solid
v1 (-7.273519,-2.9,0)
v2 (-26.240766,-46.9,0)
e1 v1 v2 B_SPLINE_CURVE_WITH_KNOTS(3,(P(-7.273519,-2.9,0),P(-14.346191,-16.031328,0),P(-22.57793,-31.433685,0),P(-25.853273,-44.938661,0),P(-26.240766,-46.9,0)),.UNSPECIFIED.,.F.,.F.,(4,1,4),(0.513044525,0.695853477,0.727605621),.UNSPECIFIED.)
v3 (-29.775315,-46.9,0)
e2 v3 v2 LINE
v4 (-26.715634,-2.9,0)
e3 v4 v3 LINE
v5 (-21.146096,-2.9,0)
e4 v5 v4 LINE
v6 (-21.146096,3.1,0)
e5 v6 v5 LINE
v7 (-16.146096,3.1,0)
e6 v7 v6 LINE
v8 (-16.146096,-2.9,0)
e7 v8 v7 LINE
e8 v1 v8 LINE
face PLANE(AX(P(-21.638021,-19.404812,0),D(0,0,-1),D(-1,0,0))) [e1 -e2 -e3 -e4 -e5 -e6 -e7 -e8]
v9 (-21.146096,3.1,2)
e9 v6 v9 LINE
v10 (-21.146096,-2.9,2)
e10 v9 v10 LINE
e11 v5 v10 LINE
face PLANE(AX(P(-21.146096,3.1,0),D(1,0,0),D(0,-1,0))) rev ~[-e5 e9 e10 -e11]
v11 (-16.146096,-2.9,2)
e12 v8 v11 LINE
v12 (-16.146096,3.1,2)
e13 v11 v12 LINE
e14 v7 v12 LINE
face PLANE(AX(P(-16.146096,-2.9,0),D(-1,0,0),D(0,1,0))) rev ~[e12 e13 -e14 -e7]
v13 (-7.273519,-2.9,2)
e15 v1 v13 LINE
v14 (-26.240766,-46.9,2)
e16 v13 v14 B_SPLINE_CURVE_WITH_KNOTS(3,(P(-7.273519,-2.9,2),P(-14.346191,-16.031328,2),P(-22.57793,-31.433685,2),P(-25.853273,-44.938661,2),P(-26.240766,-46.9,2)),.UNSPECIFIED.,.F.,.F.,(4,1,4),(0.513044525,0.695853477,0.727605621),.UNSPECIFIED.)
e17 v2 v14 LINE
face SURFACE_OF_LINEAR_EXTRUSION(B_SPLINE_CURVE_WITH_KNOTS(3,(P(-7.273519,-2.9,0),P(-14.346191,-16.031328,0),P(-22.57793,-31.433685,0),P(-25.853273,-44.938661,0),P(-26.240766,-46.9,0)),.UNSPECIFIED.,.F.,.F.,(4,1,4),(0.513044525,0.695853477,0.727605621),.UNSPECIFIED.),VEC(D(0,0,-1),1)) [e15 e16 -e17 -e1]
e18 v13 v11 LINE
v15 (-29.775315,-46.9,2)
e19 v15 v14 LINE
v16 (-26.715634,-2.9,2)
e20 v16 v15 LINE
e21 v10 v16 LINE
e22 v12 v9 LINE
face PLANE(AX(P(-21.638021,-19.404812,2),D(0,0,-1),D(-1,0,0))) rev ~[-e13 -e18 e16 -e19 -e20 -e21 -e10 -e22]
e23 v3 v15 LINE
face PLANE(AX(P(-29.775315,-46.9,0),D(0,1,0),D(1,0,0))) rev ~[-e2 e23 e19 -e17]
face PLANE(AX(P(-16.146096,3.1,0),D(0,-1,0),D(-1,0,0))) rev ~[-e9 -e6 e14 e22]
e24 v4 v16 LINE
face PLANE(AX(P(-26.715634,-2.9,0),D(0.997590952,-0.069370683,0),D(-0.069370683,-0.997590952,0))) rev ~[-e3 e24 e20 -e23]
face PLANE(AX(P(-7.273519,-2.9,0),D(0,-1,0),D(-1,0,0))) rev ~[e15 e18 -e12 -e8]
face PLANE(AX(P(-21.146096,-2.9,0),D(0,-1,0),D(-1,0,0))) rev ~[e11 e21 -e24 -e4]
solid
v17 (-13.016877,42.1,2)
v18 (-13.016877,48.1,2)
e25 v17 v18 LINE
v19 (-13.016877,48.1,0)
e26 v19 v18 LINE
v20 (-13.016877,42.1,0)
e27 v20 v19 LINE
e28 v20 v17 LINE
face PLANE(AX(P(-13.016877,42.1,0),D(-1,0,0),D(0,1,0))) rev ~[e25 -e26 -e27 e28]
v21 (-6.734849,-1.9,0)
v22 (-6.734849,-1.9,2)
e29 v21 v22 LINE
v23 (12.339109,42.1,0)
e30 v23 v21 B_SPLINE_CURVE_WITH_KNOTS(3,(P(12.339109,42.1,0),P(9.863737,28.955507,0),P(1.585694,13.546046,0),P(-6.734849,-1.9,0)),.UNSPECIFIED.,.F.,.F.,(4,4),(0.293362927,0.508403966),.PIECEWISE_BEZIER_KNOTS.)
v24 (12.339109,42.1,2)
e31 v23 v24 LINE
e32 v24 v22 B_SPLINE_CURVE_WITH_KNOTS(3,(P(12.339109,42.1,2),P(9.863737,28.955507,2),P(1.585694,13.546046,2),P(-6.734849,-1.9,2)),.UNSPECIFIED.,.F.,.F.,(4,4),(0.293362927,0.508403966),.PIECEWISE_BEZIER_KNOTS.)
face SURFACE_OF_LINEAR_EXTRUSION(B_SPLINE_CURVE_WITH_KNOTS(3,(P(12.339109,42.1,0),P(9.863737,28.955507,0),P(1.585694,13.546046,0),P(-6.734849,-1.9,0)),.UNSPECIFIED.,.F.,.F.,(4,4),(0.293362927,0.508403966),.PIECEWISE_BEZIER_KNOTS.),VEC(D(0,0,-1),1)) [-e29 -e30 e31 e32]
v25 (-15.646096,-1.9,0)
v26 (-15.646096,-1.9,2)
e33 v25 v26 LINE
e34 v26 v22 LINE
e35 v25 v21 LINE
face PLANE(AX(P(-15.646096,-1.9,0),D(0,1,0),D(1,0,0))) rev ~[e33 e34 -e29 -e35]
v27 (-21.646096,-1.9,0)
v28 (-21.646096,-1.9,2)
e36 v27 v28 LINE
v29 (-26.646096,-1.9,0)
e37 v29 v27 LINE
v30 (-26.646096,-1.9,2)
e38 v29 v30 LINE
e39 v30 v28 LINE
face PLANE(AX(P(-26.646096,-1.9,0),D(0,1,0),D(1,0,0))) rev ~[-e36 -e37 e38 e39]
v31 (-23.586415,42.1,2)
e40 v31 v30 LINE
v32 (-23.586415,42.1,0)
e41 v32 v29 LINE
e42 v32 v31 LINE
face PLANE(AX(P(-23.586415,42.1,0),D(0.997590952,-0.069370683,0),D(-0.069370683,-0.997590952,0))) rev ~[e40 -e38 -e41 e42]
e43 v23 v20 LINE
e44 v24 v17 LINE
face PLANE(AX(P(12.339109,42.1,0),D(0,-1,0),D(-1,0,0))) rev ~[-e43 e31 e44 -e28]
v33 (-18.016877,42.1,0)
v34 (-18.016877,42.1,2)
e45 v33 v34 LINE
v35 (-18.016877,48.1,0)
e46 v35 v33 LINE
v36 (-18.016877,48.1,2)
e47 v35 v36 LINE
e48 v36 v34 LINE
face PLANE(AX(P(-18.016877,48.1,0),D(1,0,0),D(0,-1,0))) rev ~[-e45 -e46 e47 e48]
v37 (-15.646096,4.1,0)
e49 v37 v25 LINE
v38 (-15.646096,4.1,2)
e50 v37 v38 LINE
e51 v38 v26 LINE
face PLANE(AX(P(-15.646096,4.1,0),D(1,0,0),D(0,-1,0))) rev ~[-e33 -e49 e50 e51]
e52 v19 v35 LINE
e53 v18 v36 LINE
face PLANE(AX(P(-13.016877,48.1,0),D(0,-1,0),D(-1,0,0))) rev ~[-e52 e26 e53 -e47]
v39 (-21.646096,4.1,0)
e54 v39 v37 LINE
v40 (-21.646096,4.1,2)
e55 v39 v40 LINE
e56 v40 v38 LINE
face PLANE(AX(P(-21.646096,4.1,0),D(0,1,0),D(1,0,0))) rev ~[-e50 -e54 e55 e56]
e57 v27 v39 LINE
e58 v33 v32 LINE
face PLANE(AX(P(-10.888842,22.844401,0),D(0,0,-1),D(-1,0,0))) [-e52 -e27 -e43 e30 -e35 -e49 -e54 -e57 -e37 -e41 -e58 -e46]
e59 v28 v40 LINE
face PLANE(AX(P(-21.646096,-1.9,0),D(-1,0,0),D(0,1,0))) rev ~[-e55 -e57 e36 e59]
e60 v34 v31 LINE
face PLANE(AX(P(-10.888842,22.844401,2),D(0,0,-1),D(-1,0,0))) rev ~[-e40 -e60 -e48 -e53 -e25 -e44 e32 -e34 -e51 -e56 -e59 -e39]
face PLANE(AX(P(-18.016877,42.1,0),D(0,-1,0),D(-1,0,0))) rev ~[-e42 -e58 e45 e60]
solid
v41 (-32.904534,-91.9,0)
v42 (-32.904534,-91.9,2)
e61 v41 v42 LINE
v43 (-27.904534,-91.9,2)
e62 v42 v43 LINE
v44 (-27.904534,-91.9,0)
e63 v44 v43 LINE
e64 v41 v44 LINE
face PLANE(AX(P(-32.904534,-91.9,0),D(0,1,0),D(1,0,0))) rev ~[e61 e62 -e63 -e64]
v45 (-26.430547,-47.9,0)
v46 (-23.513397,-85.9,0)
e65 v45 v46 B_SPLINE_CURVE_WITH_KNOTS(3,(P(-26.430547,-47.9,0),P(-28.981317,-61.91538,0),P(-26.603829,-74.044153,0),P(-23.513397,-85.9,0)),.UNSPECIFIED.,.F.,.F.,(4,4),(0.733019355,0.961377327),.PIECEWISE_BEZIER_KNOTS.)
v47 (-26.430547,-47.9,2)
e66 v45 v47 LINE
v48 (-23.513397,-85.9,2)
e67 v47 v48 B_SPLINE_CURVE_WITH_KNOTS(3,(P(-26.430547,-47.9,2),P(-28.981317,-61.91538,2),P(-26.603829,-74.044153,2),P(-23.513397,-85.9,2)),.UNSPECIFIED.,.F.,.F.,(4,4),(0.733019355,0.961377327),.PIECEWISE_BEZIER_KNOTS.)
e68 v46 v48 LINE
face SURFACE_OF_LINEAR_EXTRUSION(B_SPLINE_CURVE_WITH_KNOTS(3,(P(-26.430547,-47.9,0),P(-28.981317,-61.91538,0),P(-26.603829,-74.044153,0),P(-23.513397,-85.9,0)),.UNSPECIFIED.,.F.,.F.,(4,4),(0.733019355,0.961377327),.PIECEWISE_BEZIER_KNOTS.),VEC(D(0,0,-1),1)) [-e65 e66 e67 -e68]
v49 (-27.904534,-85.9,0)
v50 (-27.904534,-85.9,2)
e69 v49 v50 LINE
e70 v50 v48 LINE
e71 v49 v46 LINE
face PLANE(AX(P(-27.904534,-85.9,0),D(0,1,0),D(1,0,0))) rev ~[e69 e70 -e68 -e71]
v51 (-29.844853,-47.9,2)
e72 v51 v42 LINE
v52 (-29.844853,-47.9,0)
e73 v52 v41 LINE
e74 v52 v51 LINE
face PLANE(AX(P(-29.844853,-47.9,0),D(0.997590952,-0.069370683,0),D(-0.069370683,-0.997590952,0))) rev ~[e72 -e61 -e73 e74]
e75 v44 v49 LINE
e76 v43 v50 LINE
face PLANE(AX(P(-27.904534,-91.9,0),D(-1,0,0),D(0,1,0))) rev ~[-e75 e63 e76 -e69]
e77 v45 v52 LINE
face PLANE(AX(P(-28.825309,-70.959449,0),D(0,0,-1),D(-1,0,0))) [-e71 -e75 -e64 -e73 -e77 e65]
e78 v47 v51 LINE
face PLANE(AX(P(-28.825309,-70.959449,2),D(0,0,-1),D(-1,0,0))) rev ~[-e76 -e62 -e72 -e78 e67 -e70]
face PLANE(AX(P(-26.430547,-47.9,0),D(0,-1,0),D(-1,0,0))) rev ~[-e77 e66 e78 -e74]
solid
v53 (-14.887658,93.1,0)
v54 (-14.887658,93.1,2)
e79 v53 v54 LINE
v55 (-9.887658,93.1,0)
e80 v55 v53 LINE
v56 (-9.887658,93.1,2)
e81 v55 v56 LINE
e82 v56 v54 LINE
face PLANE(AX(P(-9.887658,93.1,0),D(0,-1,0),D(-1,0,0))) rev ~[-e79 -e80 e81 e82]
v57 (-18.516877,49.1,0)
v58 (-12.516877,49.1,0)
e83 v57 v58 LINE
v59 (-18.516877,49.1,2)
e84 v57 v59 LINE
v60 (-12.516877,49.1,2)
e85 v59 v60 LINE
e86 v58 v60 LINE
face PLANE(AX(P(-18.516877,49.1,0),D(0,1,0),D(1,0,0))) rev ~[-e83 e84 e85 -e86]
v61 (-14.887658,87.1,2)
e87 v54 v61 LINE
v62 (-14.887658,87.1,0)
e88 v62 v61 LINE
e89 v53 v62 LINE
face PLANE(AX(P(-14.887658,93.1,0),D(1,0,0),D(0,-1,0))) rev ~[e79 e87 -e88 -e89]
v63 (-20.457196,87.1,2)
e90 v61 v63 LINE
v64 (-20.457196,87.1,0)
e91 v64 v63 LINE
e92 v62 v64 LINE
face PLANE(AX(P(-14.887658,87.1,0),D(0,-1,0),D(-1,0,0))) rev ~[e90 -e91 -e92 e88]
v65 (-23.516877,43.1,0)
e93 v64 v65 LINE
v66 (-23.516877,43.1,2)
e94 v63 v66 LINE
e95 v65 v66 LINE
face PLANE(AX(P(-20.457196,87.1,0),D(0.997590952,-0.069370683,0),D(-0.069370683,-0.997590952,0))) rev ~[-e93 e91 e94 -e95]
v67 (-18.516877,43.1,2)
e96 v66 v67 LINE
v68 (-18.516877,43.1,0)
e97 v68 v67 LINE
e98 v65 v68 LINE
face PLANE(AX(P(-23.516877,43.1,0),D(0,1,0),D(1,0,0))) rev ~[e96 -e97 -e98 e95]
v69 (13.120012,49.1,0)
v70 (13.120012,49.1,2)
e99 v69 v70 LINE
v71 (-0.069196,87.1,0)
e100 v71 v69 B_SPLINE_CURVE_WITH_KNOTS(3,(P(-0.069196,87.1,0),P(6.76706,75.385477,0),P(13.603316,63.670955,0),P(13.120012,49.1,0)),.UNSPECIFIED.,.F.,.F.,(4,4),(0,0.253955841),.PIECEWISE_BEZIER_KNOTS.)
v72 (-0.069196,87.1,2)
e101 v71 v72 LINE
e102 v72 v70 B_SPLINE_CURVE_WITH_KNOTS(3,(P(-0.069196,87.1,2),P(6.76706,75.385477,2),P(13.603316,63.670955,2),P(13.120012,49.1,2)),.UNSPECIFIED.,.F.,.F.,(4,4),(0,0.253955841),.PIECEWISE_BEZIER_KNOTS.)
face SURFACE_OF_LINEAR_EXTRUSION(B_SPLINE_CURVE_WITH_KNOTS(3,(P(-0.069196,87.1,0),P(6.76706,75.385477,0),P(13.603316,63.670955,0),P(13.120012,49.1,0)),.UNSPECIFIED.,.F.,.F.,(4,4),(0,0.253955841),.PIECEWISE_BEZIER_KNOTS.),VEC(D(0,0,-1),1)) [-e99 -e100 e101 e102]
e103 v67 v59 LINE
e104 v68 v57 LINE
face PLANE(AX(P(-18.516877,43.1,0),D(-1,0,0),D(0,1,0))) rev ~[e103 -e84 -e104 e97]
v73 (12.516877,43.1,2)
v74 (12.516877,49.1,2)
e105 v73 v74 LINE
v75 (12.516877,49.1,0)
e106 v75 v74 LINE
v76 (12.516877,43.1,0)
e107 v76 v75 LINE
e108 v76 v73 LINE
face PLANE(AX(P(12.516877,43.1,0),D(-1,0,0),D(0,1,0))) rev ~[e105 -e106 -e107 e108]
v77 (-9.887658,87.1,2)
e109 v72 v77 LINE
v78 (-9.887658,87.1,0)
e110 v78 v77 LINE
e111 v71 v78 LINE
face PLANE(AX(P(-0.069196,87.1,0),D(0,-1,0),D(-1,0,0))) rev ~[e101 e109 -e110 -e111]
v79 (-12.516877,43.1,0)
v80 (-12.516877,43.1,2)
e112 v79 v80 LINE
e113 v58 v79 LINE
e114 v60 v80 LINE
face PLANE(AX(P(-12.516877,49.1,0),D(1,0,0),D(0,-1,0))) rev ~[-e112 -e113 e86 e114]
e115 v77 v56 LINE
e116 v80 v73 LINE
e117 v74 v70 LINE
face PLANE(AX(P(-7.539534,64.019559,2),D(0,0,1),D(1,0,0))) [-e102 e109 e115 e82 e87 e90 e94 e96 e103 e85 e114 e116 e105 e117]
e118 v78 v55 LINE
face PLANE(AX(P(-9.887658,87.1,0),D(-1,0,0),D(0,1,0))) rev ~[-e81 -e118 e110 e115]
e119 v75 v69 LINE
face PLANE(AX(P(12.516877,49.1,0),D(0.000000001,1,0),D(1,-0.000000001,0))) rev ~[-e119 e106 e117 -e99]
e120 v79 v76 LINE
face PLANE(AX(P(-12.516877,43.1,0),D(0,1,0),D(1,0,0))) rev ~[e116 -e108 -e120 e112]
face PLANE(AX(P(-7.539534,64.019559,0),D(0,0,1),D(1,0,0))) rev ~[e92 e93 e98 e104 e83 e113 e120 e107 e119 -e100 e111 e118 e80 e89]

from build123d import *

# Parameters (mm, degrees)
F1_DEPTH = 2


with BuildPart() as f1:
    # F0 (on Top) → F1 (new body)
    with BuildSketch(Plane.XY):
        with BuildLine():
            Line((-20.4571957112, 87.1), (-23.5168766766, 43.1))
            Line((-23.5168766766, 43.1), (-18.5168766766, 43.1))
            Line((-18.5168766766, 43.1), (-18.5168766766, 49.1))
            Line((-18.5168766766, 49.1), (-12.5168766766, 49.1))
            Line((-12.5168766766, 49.1), (-12.5168766766, 43.1))
            Line((-12.5168766766, 43.1), (12.5168766766, 43.1))
            Line((12.5168766766, 43.1), (12.5168766766, 49.1))
            Line((12.5168766766, 49.1), (13.1200117893, 49.0999999996))
            add(Edge.make_bspline(
                [(-0.0691957112, 87.1), (6.7670600664, 75.385477326), (13.603315844, 63.6709546521), (13.1200117893, 49.0999999996)],
                knots=[0, 0, 0, 0, 0.2539558406, 0.2539558406, 0.2539558406, 0.2539558406], degree=3))
            Line((-0.0691957112, 87.1), (-9.8876575074, 87.1))
            Line((-9.8876575074, 87.1), (-9.8876575074, 93.1))
            Line((-9.8876575074, 93.1), (-14.8876575074, 93.1))
            Line((-14.8876575074, 93.1), (-14.8876575074, 87.1))
            Line((-14.8876575074, 87.1), (-20.4571957112, 87.1))
        make_face()
    extrude(amount=F1_DEPTH)


with BuildPart() as f1b:
    # F0 (on Top) → F1, piece 2 (new body)
    with BuildSketch(Plane.XY):
        with BuildLine():
            add(Edge.make_bspline(
                [(-26.4305470242, -47.9), (-28.9813165577, -61.9153804796), (-26.6038291609, -74.0441530198), (-23.513396984, -85.9)],
                knots=[0.7330193554, 0.7330193554, 0.7330193554, 0.7330193554, 0.9613773268, 0.9613773268, 0.9613773268, 0.9613773268], degree=3))
            Line((-26.4305470242, -47.9), (-29.8448532186, -47.9))
            Line((-29.8448532186, -47.9), (-32.904534184, -91.9))
            Line((-32.904534184, -91.9), (-27.904534184, -91.9))
            Line((-27.904534184, -91.9), (-27.904534184, -85.9))
            Line((-27.904534184, -85.9), (-23.513396984, -85.9))
        make_face()
    extrude(amount=F1_DEPTH)


with BuildPart() as f1c:
    # F0 (on Top) → F1, piece 3 (new body)
    with BuildSketch(Plane.XY):
        with BuildLine():
            add(Edge.make_bspline(
                [(-7.2735192987, -2.9), (-14.3461911795, -16.0313284972), (-22.5779302826, -31.4336846167), (-25.8532730678, -44.9386606326), (-26.2407663034, -46.9)],
                knots=[0.5130445245, 0.5130445245, 0.5130445245, 0.5130445245, 0.6958534771, 0.7276056207, 0.7276056207, 0.7276056207, 0.7276056207], degree=3))
            Line((-7.2735192987, -2.9), (-16.1460958457, -2.9))
            Line((-16.1460958457, -2.9), (-16.1460958457, 3.1))
            Line((-16.1460958457, 3.1), (-21.1460958457, 3.1))
            Line((-21.1460958457, 3.1), (-21.1460958457, -2.9))
            Line((-21.1460958457, -2.9), (-26.7156340495, -2.9))
            Line((-26.7156340495, -2.9), (-29.7753150149, -46.9))
            Line((-29.7753150149, -46.9), (-26.2407663034, -46.9))
        make_face()
    extrude(amount=F1_DEPTH)


with BuildPart() as f1d:
    # F0 (on Top) → F1, piece 4 (new body)
    with BuildSketch(Plane.XY):
        with BuildLine():
            add(Edge.make_bspline(
                [(12.3391092449, 42.1), (9.8637373658, 28.9555074487), (1.5856940975, 13.5460464111), (-6.7348489575, -1.9)],
                knots=[0.2933629272, 0.2933629272, 0.2933629272, 0.2933629272, 0.5084039656, 0.5084039656, 0.5084039656, 0.5084039656], degree=3))
            Line((12.3391092449, 42.1), (-13.0168766766, 42.1))
            Line((-13.0168766766, 42.1), (-13.0168766766, 48.1))
            Line((-13.0168766766, 48.1), (-18.0168766766, 48.1))
            Line((-18.0168766766, 48.1), (-18.0168766766, 42.1))
            Line((-18.0168766766, 42.1), (-23.5864148803, 42.1))
            Line((-23.5864148803, 42.1), (-26.6460958457, -1.9))
            Line((-26.6460958457, -1.9), (-21.6460958457, -1.9))
            Line((-21.6460958457, -1.9), (-21.6460958457, 4.1))
            Line((-21.6460958457, 4.1), (-15.6460958457, 4.1))
            Line((-15.6460958457, 4.1), (-15.6460958457, -1.9))
            Line((-15.6460958457, -1.9), (-6.7348489575, -1.9))
        make_face()
    extrude(amount=F1_DEPTH)


solid = Compound([f1.part, f1b.part, f1c.part, f1d.part])
